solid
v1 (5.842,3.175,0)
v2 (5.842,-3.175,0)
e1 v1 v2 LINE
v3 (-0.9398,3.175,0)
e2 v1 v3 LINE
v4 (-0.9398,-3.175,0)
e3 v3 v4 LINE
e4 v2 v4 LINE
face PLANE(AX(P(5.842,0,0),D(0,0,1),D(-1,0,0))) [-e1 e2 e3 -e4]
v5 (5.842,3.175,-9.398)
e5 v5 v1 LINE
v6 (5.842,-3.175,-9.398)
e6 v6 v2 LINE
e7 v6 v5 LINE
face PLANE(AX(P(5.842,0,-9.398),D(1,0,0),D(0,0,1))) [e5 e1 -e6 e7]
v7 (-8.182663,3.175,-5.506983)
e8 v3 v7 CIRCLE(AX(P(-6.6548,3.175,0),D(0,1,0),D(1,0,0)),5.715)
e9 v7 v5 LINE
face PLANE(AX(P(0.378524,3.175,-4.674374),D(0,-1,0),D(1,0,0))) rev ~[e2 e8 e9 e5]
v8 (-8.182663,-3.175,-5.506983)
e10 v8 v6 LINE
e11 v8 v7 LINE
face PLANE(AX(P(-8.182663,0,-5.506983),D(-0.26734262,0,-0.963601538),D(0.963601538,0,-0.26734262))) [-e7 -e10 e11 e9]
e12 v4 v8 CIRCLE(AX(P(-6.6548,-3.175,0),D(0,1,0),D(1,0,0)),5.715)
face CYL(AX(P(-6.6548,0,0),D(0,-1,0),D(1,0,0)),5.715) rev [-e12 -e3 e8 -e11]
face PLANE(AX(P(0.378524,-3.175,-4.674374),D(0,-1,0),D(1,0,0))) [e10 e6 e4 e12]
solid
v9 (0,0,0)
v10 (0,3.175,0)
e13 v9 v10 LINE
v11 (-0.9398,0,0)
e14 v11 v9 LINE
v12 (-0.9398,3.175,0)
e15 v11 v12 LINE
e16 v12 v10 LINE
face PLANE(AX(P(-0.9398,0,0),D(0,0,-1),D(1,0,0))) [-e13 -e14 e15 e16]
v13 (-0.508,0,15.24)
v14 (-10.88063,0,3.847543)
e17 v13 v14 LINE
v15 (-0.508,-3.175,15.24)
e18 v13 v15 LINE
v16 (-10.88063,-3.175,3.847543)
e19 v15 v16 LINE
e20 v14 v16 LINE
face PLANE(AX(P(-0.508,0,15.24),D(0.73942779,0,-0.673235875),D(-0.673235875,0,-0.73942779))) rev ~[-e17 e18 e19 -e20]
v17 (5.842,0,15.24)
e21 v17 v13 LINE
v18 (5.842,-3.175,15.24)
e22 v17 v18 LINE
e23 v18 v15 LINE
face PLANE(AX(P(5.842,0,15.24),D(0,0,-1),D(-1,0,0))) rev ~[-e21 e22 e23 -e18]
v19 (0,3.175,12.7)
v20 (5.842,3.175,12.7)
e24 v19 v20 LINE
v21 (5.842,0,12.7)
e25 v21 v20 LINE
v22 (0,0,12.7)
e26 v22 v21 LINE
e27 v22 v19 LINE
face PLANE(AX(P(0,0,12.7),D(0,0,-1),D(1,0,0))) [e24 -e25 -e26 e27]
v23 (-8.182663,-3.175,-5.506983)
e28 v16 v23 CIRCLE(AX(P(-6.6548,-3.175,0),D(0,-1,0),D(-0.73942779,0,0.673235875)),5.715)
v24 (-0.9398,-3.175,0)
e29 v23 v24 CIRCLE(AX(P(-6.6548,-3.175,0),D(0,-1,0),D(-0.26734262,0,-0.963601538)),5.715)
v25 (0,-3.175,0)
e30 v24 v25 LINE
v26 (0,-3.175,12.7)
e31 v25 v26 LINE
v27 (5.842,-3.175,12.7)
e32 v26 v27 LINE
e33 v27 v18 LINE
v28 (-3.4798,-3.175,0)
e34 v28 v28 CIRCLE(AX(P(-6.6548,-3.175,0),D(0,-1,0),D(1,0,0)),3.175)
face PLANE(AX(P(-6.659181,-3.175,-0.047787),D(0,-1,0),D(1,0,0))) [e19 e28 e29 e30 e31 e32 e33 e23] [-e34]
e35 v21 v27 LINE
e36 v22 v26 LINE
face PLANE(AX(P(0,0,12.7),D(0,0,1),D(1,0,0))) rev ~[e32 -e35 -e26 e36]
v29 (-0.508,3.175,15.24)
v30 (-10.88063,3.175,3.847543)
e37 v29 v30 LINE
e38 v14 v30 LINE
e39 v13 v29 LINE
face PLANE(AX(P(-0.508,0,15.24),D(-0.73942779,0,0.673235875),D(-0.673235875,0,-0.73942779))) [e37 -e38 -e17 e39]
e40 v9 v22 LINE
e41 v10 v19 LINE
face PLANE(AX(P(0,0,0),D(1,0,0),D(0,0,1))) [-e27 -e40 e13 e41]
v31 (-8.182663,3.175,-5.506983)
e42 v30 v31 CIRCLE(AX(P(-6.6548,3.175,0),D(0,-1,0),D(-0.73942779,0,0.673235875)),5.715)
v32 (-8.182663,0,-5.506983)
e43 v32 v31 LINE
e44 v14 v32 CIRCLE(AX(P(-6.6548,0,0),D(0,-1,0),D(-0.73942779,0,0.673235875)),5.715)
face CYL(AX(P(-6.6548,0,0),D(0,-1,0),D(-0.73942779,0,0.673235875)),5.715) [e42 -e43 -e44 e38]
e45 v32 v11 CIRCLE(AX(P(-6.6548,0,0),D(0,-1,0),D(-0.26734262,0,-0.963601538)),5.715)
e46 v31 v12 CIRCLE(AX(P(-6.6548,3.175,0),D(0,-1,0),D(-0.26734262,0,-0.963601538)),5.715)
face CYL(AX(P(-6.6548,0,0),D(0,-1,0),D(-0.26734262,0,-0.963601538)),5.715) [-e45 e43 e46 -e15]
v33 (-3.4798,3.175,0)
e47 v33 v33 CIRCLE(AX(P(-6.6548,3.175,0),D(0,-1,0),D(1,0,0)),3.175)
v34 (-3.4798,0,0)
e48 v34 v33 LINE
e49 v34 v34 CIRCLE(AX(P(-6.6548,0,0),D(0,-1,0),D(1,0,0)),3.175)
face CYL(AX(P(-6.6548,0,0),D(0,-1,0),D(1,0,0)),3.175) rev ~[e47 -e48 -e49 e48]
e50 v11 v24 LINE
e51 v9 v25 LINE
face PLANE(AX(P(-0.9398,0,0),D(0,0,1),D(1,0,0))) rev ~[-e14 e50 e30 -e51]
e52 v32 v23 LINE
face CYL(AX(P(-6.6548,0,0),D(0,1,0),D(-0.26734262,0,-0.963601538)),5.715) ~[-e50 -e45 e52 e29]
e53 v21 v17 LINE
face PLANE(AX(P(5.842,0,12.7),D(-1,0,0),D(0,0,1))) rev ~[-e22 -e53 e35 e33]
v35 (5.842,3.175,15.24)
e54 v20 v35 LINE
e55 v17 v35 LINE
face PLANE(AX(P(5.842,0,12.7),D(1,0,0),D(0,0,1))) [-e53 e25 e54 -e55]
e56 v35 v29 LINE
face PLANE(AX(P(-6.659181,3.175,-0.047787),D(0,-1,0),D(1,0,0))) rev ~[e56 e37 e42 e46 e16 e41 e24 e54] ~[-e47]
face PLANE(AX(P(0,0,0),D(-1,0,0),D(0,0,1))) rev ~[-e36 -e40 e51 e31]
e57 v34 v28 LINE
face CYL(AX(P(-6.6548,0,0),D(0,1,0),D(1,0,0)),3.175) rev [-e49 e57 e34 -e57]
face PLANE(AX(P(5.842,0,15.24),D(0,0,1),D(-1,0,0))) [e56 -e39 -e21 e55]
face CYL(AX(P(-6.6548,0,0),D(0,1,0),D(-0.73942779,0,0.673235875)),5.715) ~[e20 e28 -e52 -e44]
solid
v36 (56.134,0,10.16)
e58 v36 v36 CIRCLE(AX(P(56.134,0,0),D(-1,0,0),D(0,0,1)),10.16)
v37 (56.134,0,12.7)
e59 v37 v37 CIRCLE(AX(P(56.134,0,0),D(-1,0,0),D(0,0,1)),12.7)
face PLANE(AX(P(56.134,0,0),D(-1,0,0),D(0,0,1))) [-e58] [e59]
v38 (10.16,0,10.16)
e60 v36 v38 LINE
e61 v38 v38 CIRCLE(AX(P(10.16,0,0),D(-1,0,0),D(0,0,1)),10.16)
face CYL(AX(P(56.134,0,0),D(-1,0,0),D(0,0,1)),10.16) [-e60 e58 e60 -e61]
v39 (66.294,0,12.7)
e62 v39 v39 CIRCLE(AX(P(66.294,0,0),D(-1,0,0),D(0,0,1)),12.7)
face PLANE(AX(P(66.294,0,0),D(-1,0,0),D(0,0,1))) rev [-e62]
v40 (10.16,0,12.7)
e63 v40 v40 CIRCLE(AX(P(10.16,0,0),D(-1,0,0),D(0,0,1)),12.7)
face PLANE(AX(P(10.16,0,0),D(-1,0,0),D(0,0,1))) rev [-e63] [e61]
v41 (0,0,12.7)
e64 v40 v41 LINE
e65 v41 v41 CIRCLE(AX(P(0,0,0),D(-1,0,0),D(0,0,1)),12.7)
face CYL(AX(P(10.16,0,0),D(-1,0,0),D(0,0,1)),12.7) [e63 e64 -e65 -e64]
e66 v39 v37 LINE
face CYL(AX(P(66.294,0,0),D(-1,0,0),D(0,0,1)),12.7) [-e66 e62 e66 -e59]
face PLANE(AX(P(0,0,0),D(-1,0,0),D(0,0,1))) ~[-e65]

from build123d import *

# Parameters (mm, degrees)
F0_W     = 5.842
F0_H     = 12.7
F0_R     = 3.175
F3_DEPTH = 3.175


# Not quite as in the source:
# - a feature of the source that left no trace in its solid (it failed there, or was rolled back) is left out


with BuildPart() as f1:
    # F0 (on Front) → F1 (revolve)
    with BuildSketch(Plane.XZ):
        Polygon((5.842, 12.7), (5.842, 0), (66.294, 0), (66.294, 12.7), (56.134, 12.7), (56.134, 10.16), (10.16, 10.16), (10.16, 12.7), align=None)
        with Locations((2.921, 6.35)):
            Rectangle(F0_W, F0_H)
    revolve(axis=Axis((33.147, 0, 0), (-1, 0, 0)))


with BuildPart() as f3:
    # F0 (on Front) → F3 (new body, symmetric)
    with BuildSketch(Plane.XZ):
        with BuildLine():
            ThreePointArc((-8.1826630726, -5.5069827884), (-3.1957909266, -4.5493385486), (-0.9398, 0))
            ThreePointArc((-0.9398, 0), (-4.5919612295, 5.3297205562), (-10.8806298187, 3.8475430269))
            ThreePointArc((-10.8806298187, 3.8475430269), (-12.1459778134, -1.5837270034), (-8.1826630726, -5.5069827884))
        make_face()
        with Locations((-6.6548, 0)):
            Circle(F0_R, mode=Mode.SUBTRACT)
        with BuildLine():
            Line((-0.9398, 0), (0, 0))
            Line((0, 0), (0, 12.7))
            Line((0, 12.7), (5.842, 12.7))
            Line((5.842, 12.7), (5.842, 15.24))
            Line((5.842, 15.24), (-0.508, 15.24))
            Line((-0.508, 15.24), (-10.8806298187, 3.8475430269))
            ThreePointArc((-10.8806298187, 3.8475430269), (-4.5919612295, 5.3297205562), (-0.9398, 0))
        make_face()
    extrude(amount=F3_DEPTH, both=True)


with BuildPart() as f3b:
    # F2 (on face) → F3, piece 2 (new body, symmetric)
    with BuildSketch(Plane.XZ):
        with BuildLine():
            Line((5.842, -9.398), (5.842, 0))
            Line((5.842, 0), (0, 0))
            Line((0, 0), (-0.9398, 0))
            ThreePointArc((-0.9398, 0), (-3.1957909266, -4.5493385486), (-8.1826630726, -5.5069827884))
            Line((-8.1826630726, -5.5069827884), (5.842, -9.398))
        make_face()
    extrude(amount=F3_DEPTH, both=True)


solid = Compound([f1.part, f3.part, f3b.part])
